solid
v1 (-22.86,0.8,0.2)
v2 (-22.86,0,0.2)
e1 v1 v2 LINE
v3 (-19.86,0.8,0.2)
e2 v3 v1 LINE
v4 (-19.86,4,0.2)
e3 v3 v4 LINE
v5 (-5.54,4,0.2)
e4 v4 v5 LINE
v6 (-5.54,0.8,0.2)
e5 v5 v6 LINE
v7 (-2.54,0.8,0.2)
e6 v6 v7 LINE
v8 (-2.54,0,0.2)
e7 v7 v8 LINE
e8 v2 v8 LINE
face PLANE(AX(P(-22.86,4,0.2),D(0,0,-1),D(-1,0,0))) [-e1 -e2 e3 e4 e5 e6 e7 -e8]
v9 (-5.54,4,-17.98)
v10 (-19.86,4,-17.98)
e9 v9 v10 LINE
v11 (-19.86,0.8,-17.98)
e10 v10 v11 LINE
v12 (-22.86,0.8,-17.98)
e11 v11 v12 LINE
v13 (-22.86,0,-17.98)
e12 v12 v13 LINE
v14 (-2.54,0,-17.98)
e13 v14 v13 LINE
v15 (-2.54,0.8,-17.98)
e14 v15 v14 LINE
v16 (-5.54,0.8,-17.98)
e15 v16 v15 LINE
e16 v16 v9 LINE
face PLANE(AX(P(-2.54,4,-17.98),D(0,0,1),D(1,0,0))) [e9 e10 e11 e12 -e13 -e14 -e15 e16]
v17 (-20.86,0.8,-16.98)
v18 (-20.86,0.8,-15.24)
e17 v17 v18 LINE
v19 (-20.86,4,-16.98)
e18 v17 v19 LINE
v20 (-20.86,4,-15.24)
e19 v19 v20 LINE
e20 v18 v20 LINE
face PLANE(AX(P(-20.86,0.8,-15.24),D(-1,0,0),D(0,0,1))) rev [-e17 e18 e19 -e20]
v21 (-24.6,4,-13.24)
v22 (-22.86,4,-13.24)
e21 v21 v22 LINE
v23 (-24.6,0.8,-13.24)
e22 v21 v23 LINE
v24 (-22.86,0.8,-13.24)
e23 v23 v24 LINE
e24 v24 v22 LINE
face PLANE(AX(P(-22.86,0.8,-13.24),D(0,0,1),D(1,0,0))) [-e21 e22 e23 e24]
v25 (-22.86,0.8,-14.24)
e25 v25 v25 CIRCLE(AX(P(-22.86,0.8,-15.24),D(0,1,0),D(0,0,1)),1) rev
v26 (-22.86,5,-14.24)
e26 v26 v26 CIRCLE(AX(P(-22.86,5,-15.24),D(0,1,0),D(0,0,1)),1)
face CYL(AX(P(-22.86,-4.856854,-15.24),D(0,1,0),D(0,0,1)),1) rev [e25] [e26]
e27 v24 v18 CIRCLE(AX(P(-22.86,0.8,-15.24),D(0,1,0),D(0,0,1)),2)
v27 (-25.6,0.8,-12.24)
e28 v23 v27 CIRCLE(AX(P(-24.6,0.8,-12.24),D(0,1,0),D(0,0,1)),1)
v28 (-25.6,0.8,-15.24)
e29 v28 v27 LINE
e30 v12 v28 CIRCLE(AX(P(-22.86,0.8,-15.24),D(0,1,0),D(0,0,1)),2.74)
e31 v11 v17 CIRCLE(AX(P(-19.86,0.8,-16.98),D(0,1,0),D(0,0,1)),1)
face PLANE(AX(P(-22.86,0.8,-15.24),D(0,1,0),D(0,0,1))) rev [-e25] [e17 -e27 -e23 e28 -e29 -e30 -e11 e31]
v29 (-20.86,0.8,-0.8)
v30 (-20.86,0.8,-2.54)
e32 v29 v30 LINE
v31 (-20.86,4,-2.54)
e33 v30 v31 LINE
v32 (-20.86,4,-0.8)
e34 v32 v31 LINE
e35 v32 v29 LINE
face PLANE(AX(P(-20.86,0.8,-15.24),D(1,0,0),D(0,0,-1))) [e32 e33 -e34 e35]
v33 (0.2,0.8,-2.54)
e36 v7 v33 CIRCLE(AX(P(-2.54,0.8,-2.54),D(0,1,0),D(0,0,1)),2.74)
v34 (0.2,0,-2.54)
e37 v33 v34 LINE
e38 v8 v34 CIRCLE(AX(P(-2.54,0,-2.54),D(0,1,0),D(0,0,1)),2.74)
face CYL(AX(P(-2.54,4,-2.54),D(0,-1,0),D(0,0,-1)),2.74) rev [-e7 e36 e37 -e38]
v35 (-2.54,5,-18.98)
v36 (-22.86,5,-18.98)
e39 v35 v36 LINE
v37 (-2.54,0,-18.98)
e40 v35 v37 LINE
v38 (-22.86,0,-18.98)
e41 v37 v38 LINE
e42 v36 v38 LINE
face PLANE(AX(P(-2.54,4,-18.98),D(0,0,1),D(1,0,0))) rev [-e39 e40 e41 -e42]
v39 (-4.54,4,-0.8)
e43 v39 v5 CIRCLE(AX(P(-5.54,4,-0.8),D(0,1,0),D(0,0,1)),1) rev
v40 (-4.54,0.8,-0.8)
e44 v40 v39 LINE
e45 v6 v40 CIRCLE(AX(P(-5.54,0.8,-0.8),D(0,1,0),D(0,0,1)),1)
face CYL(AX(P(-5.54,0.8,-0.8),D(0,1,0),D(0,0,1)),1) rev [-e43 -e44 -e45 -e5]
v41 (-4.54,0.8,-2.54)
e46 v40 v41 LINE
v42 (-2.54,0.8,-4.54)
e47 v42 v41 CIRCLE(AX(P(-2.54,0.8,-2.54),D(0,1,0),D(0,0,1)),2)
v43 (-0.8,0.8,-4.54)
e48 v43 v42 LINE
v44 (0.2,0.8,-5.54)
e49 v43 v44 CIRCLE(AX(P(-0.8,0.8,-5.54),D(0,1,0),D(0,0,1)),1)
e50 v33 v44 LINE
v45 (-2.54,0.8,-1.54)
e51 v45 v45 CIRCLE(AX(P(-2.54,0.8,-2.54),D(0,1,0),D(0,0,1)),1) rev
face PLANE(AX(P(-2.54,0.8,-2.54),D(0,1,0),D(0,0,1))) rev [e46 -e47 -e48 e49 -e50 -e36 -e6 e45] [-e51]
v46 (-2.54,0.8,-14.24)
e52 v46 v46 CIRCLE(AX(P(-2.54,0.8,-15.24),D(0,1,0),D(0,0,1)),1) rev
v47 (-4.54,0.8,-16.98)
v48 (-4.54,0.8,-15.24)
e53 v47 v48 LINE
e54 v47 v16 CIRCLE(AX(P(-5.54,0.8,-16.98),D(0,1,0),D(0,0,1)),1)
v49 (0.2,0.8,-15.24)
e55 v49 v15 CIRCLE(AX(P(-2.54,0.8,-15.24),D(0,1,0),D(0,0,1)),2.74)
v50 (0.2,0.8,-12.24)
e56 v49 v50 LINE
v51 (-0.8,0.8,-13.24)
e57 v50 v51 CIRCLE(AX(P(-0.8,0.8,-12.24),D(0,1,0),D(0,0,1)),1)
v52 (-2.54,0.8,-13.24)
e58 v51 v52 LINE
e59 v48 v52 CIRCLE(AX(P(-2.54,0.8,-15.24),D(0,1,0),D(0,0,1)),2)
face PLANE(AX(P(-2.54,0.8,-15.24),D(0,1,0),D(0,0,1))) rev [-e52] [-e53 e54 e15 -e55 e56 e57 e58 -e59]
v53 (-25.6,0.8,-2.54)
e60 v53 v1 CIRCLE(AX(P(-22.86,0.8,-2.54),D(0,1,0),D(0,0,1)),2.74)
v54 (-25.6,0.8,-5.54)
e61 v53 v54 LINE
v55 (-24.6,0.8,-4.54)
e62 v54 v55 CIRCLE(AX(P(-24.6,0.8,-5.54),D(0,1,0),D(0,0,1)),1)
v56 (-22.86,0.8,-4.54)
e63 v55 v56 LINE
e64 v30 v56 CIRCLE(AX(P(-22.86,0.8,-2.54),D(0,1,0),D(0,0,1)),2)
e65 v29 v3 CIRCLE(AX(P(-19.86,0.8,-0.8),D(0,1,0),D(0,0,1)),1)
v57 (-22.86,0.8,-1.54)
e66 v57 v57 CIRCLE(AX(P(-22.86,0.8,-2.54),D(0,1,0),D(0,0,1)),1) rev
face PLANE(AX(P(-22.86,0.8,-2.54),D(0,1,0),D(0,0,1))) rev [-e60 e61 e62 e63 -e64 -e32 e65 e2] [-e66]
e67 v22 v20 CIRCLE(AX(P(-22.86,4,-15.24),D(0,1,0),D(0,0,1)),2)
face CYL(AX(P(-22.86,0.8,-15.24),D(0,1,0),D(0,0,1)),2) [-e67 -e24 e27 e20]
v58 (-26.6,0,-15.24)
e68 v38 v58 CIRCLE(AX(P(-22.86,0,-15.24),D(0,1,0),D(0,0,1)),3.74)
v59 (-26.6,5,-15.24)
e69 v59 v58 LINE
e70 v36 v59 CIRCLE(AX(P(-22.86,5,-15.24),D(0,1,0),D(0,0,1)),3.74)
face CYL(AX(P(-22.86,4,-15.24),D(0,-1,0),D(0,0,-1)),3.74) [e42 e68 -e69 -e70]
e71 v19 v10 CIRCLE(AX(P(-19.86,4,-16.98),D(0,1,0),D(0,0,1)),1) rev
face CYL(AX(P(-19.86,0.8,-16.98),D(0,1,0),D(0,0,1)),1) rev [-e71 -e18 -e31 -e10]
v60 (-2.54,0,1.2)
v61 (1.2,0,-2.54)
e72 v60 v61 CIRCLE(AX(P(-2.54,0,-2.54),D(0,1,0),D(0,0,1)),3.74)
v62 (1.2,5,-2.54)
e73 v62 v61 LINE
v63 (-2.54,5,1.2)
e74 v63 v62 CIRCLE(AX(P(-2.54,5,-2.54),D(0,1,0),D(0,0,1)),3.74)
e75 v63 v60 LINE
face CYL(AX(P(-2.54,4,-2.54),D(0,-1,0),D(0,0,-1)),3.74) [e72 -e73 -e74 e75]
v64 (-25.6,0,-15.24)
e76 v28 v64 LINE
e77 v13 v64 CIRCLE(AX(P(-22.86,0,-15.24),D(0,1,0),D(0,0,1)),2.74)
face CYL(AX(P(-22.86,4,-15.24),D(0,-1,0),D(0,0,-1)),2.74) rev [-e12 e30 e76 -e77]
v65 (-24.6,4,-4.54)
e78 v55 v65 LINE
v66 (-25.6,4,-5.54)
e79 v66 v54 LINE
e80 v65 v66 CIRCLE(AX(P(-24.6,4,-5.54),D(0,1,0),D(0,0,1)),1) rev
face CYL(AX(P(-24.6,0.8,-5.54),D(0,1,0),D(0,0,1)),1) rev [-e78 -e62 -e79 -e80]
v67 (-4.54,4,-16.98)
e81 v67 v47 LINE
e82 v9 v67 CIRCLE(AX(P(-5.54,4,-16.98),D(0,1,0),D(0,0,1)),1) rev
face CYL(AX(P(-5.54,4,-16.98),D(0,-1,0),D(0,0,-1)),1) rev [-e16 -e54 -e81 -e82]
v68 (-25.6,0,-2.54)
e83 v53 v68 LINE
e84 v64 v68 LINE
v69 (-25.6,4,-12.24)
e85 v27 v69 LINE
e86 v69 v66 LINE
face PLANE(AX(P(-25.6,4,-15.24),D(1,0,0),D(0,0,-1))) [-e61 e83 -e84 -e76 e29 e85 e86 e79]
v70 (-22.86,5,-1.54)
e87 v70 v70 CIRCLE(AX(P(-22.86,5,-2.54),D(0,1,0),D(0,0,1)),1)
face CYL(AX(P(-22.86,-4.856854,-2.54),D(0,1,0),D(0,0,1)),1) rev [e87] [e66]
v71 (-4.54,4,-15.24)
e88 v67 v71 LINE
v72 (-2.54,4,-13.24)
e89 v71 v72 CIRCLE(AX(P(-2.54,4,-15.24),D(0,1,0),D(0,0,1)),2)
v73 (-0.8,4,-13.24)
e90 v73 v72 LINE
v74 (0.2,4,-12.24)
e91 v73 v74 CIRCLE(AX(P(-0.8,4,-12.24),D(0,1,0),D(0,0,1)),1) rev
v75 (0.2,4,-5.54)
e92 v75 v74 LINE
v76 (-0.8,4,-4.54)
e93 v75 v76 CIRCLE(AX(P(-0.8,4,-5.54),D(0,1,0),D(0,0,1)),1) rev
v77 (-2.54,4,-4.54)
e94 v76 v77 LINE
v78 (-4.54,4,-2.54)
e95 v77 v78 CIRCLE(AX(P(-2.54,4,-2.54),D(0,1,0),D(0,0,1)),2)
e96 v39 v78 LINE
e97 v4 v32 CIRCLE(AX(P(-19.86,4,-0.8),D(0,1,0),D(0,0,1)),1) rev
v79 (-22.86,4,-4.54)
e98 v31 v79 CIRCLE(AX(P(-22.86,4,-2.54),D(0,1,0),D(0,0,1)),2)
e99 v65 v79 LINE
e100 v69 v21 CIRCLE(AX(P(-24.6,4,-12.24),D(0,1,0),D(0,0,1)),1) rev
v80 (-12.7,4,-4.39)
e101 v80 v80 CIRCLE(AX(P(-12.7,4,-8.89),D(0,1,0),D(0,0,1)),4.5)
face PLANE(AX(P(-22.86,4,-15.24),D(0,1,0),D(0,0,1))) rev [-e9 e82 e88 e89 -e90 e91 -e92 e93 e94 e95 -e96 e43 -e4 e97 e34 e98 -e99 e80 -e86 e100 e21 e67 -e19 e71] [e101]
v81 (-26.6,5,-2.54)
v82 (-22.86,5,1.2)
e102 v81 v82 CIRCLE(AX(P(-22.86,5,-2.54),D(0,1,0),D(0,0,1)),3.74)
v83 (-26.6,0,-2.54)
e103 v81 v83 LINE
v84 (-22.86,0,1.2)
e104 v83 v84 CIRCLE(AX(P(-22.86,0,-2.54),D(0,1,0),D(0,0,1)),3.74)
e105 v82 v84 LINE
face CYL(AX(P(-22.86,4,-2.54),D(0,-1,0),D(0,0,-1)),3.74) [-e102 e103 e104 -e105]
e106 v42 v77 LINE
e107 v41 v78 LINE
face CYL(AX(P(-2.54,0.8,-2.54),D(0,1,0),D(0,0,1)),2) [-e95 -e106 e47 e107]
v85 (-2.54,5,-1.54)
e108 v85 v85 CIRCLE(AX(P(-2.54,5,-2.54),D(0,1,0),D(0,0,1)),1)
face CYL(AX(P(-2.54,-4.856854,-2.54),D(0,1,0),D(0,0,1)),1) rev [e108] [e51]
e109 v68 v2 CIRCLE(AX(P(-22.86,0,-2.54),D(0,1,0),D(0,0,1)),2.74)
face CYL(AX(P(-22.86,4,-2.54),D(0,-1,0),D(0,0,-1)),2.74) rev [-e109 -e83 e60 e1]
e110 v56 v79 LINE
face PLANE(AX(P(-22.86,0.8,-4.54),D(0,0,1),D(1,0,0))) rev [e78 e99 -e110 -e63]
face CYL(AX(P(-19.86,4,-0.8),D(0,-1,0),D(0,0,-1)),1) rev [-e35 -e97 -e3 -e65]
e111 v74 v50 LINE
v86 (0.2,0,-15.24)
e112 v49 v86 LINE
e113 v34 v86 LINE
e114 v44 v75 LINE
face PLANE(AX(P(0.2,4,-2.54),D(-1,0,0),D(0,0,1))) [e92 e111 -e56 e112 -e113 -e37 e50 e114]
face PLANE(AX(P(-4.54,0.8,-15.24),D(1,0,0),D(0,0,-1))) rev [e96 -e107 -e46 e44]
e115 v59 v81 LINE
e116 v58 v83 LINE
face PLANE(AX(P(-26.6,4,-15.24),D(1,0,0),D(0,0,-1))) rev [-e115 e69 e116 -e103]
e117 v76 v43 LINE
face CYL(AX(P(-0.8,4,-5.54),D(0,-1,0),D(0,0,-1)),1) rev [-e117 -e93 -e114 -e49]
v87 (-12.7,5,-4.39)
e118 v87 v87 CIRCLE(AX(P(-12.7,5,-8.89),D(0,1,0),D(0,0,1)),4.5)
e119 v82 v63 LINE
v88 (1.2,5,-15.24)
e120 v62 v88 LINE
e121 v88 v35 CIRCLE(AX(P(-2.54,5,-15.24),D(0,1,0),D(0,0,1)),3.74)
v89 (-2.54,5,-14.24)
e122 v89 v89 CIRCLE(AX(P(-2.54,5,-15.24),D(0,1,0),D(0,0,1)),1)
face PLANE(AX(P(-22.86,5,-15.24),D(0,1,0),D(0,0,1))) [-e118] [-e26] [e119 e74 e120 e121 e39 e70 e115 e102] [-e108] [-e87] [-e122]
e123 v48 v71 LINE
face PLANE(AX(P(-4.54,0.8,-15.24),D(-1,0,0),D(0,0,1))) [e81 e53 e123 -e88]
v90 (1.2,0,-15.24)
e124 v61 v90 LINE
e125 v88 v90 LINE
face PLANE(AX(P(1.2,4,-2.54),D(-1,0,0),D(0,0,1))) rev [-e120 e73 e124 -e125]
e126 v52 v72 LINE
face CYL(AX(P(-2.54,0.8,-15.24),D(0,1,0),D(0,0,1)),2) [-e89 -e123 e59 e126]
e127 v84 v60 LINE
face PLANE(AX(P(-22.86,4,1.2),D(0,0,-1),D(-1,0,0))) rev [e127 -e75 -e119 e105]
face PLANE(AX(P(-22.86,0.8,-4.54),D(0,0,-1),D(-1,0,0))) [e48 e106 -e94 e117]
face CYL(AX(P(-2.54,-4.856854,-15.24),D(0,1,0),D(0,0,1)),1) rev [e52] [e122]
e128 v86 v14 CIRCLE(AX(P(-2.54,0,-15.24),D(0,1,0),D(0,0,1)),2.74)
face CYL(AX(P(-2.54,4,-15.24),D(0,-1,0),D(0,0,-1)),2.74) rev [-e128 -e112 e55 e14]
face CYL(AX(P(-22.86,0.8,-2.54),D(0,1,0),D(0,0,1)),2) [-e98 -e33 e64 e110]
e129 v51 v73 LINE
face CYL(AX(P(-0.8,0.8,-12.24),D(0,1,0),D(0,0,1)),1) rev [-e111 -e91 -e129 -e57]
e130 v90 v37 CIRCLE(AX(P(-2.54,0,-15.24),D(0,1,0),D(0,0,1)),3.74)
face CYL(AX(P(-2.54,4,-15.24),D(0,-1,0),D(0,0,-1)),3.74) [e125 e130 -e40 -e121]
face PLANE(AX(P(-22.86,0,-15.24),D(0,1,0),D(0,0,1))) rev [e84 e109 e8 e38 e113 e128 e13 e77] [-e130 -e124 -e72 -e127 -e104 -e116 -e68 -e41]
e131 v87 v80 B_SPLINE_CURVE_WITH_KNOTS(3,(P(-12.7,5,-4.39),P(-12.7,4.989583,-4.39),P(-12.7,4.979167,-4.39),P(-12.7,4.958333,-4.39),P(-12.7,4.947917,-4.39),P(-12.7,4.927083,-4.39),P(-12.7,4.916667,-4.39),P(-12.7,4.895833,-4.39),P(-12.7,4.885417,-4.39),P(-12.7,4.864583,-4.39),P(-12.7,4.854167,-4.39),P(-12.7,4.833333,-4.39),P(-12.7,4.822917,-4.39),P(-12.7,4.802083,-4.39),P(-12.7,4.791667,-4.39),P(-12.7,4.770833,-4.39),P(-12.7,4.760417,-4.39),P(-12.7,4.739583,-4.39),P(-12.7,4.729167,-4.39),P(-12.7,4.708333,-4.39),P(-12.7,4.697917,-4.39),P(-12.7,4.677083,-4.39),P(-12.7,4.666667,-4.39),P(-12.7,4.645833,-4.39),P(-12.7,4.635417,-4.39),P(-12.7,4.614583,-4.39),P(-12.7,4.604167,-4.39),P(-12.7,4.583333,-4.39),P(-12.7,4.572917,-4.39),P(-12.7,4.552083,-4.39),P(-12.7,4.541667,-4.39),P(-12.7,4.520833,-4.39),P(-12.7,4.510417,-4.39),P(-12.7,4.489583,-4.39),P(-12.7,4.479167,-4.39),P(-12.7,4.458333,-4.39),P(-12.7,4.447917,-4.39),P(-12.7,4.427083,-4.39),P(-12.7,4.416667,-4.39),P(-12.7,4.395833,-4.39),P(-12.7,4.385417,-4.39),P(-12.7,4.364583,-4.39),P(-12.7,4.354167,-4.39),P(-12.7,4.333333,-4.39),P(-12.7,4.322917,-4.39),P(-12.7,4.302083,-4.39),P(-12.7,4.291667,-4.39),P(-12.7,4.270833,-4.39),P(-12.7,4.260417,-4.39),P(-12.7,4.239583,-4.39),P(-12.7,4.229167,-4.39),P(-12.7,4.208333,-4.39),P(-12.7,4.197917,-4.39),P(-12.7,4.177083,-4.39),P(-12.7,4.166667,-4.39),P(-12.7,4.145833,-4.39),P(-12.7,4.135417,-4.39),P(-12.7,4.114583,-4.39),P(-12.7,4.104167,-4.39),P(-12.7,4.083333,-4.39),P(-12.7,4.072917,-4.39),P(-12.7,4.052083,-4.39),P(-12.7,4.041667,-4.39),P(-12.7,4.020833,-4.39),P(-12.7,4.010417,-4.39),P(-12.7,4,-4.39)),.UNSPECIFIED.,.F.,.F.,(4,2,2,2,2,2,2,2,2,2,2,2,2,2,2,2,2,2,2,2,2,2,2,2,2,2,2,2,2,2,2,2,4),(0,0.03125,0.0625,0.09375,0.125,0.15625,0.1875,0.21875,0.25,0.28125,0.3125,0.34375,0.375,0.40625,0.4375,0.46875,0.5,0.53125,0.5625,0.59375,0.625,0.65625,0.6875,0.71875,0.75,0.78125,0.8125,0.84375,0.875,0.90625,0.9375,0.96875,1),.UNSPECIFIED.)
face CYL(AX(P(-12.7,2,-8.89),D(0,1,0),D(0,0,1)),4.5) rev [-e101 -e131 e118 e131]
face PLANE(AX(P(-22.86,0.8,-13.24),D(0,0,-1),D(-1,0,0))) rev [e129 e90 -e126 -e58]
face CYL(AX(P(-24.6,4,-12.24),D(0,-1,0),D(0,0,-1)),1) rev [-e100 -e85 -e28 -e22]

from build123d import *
from build123d.topology import SkipClean

# Parameters (mm, degrees)
BOSS_EXTRUDE1_DEPTH       = 4
BOSS_EXTRUDE2_DEPTH       = 1
BOSS_EXTRUDE3_START       = -0.8
SKETCH4_R                 = 2
SKETCH4_R_2               = 1.25
BOSS_EXTRUDE3_DEPTH       = 3.2
MIRROR4_START             = -0.8
MIRROR4_COPY_1_SKETCH_R   = 2
MIRROR4_COPY_1_SKETCH_R_2 = 1.25
MIRROR4_COPY_1_DEPTH      = 3.2
SKETCH5_R                 = 4.5
CUT_EXTRUDE1_DEPTH        = 3
SKETCH1_R                 = 1.25
CUT_EXTRUDE2_DEPTH        = 10
FILLET2_R                 = 1
EXTRUDE_THIN1_START       = -4.2
SKETCH6_R                 = 2
SKETCH6_R_2               = 1
EXTRUDE_THIN1_DEPTH       = 4.2


with BuildPart() as part:
    # Sketch2 → Boss-Extrude1 (new body)
    with BuildSketch(Plane(origin=(0, 0, 0), x_dir=(1, 0, 0), z_dir=(0, 1, 0))):
        with BuildLine():
            Line((-26.6, 15.24), (-26.6, 2.54))
            ThreePointArc((-26.6, 2.54), (-25.504579362, -0.104579362), (-22.86, -1.2))
            Line((-22.86, -1.2), (-2.54, -1.2))
            ThreePointArc((-2.54, -1.2), (0.104579362, -0.104579362), (1.2, 2.54))
            Line((1.2, 2.54), (1.2, 15.24))
            ThreePointArc((1.2, 15.24), (0.104579362, 17.884579362), (-2.54, 18.98))
            Line((-2.54, 18.98), (-22.86, 18.98))
            ThreePointArc((-22.86, 18.98), (-25.504579362, 17.884579362), (-26.6, 15.24))
        make_face()
        with BuildLine():
            Line((0.2, 2.54), (0.2, 15.24))
            ThreePointArc((0.2, 15.24), (-0.60252742, 17.17747258), (-2.54, 17.98))
            Line((-2.54, 17.98), (-22.86, 17.98))
            ThreePointArc((-22.86, 17.98), (-24.79747258, 17.17747258), (-25.6, 15.24))
            Line((-25.6, 15.24), (-25.6, 2.54))
            ThreePointArc((-25.6, 2.54), (-24.79747258, 0.60252742), (-22.86, -0.2))
            Line((-22.86, -0.2), (-2.54, -0.2))
            ThreePointArc((-2.54, -0.2), (-0.60252742, 0.60252742), (0.2, 2.54))
        make_face(mode=Mode.SUBTRACT)
    extrude(amount=BOSS_EXTRUDE1_DEPTH)

    # Sketch3 → Boss-Extrude2 (add)
    with BuildSketch(Plane(origin=(0, 4, 0), x_dir=(1, 0, 0), z_dir=(0, 1, 0))):
        with BuildLine():
            Line((-26.6, 15.24), (-26.6, 2.54))
            ThreePointArc((-26.6, 2.54), (-25.504579362, -0.104579362), (-22.86, -1.2))
            Line((-22.86, -1.2), (-2.54, -1.2))
            ThreePointArc((-2.54, -1.2), (0.104579362, -0.104579362), (1.2, 2.54))
            Line((1.2, 2.54), (1.2, 15.24))
            ThreePointArc((1.2, 15.24), (0.104579362, 17.884579362), (-2.54, 18.98))
            Line((-2.54, 18.98), (-22.86, 18.98))
            ThreePointArc((-22.86, 18.98), (-25.504579362, 17.884579362), (-26.6, 15.24))
        make_face()
    extrude(amount=BOSS_EXTRUDE2_DEPTH)

    # Sketch4 → Boss-Extrude3 (add)
    # profile 1 of 2: a face of its own
    with BuildSketch(Plane.XZ.offset(BOSS_EXTRUDE3_START)):
        with BuildLine():
            ThreePointArc((-22.86, -4.54), (-24.274213562, -1.125786438), (-20.86, -2.54))
            Line((-20.86, -2.54), (-20.86, 0.2))
            Line((-20.86, 0.2), (-22.86, 0.2))
            ThreePointArc((-22.86, 0.2), (-24.79747258, -0.60252742), (-25.6, -2.54))
            Line((-25.6, -2.54), (-25.6, -4.54))
            Line((-25.6, -4.54), (-22.86, -4.54))
        make_face()
    # profile 2 of 2: a face of its own
    with BuildSketch(Plane.XZ.offset(BOSS_EXTRUDE3_START)):
        with Locations((-22.86, -2.54)):
            Circle(SKETCH4_R)
        with Locations(Location((-22.86, -2.54, 0), (0, 0, 90))):
            Circle(SKETCH4_R_2, mode=Mode.SUBTRACT)
    boss_extrude3 = extrude(amount=-BOSS_EXTRUDE3_DEPTH)

    # Mirror3: Boss-Extrude3 across plane
    add(boss_extrude3.mirror(Plane.ZY.offset(12.7)))

    # Mirror4: Boss-Extrude3 across plane
    add(boss_extrude3.mirror(Plane(origin=(0, 0, -8.89), x_dir=(1, 0, 0), z_dir=(0, 0, -1))))

    # Mirror4 copy 1 sketch → Mirror4 copy 1 (add)
    # profile 1 of 2: a face of its own
    with BuildSketch(Plane(origin=(-25.4, 0, -17.78), x_dir=(-1, 0, 0), z_dir=(0, -1, 0)).offset(MIRROR4_START)):
        with BuildLine():
            ThreePointArc((-22.86, -4.54), (-24.274213562, -1.125786438), (-20.86, -2.54))
            Line((-20.86, -2.54), (-20.86, 0.2))
            Line((-20.86, 0.2), (-22.86, 0.2))
            ThreePointArc((-22.86, 0.2), (-24.79747258, -0.60252742), (-25.6, -2.54))
            Line((-25.6, -2.54), (-25.6, -4.54))
            Line((-25.6, -4.54), (-22.86, -4.54))
        make_face()
    # profile 2 of 2: a face of its own
    with BuildSketch(Plane(origin=(-25.4, 0, -17.78), x_dir=(-1, 0, 0), z_dir=(0, -1, 0)).offset(MIRROR4_START)):
        with Locations((-22.86, -2.54)):
            Circle(MIRROR4_COPY_1_SKETCH_R)
        with Locations(Location((-22.86, -2.54, 0), (0, 0, 90))):
            Circle(MIRROR4_COPY_1_SKETCH_R_2, mode=Mode.SUBTRACT)
    extrude(amount=-MIRROR4_COPY_1_DEPTH)

    # Sketch5 → Cut-Extrude1 (cut)
    with BuildSketch(Plane(origin=(0, 5, 0), x_dir=(1, 0, 0), z_dir=(0, 1, 0))):
        with Locations(Location((-12.7, 8.89, 0), (0, 0, 270))):
            Circle(SKETCH5_R)
    extrude(amount=-CUT_EXTRUDE1_DEPTH, mode=Mode.SUBTRACT)

    # Sketch1 → Cut-Extrude2 (cut)
    with SkipClean():  # the faces are left unmerged after this step: merging them gives an invalid solid
        with BuildSketch(Plane(origin=(0, 0, 0), x_dir=(1, 0, 0), z_dir=(0, 1, 0))):
            with Locations(Location((-22.86, 2.54, 0), (0, 0, 270))):
                Circle(SKETCH1_R)
            with Locations(Location((-2.54, 2.54, 0), (0, 0, 270))):
                Circle(SKETCH1_R)
            with Locations(Location((-2.54, 15.24, 0), (0, 0, 270))):
                Circle(SKETCH1_R)
            with Locations(Location((-22.86, 15.24, 0), (0, 0, 270))):
                Circle(SKETCH1_R)
        extrude(amount=CUT_EXTRUDE2_DEPTH, mode=Mode.SUBTRACT)
    add(part.part.scale(1), mode=Mode.REPLACE)  # the faces are merged on a copy

    # Fillet2
    fillet2_edges = [part.edges().sort_by_distance(p)[0] for p in [
        (-4.54, 2.4, 0.2),
        (0.2, 2.4, -4.54),
        (0.2, 2.4, -13.24),
        (-4.54, 2.4, -17.98),
        (-20.86, 2.4, -17.98),
        (-25.6, 2.4, -13.24),
        (-25.6, 2.4, -4.54),
        (-20.86, 2.4, 0.2),
    ]]
    fillet(fillet2_edges, radius=FILLET2_R)

    # Sketch6 → Extrude-Thin1 (add)
    # profile 1 of 4: a face of its own
    with BuildSketch(Plane(origin=(0, 5, 0), x_dir=(1, 0, 0), z_dir=(0, 1, 0)).offset(EXTRUDE_THIN1_START)):
        with Locations((-2.54, 15.24)):
            Circle(SKETCH6_R)
        with Locations((-2.54, 15.24)):
            Circle(SKETCH6_R_2, mode=Mode.SUBTRACT)
    # profile 2 of 4: a face of its own
    with BuildSketch(Plane(origin=(0, 5, 0), x_dir=(1, 0, 0), z_dir=(0, 1, 0)).offset(EXTRUDE_THIN1_START)):
        with Locations((-22.86, 15.24)):
            Circle(SKETCH6_R)
        with Locations((-22.86, 15.24)):
            Circle(SKETCH6_R_2, mode=Mode.SUBTRACT)
    # profile 3 of 4: a face of its own
    with BuildSketch(Plane(origin=(0, 5, 0), x_dir=(1, 0, 0), z_dir=(0, 1, 0)).offset(EXTRUDE_THIN1_START)):
        with Locations((-2.54, 2.54)):
            Circle(SKETCH6_R)
        with Locations((-2.54, 2.54)):
            Circle(SKETCH6_R_2, mode=Mode.SUBTRACT)
    # profile 4 of 4: a face of its own
    with BuildSketch(Plane(origin=(0, 5, 0), x_dir=(1, 0, 0), z_dir=(0, 1, 0)).offset(EXTRUDE_THIN1_START)):
        with Locations((-22.86, 2.54)):
            Circle(SKETCH6_R)
        with Locations((-22.86, 2.54)):
            Circle(SKETCH6_R_2, mode=Mode.SUBTRACT)
    extrude(amount=EXTRUDE_THIN1_DEPTH)


solid = part.part
